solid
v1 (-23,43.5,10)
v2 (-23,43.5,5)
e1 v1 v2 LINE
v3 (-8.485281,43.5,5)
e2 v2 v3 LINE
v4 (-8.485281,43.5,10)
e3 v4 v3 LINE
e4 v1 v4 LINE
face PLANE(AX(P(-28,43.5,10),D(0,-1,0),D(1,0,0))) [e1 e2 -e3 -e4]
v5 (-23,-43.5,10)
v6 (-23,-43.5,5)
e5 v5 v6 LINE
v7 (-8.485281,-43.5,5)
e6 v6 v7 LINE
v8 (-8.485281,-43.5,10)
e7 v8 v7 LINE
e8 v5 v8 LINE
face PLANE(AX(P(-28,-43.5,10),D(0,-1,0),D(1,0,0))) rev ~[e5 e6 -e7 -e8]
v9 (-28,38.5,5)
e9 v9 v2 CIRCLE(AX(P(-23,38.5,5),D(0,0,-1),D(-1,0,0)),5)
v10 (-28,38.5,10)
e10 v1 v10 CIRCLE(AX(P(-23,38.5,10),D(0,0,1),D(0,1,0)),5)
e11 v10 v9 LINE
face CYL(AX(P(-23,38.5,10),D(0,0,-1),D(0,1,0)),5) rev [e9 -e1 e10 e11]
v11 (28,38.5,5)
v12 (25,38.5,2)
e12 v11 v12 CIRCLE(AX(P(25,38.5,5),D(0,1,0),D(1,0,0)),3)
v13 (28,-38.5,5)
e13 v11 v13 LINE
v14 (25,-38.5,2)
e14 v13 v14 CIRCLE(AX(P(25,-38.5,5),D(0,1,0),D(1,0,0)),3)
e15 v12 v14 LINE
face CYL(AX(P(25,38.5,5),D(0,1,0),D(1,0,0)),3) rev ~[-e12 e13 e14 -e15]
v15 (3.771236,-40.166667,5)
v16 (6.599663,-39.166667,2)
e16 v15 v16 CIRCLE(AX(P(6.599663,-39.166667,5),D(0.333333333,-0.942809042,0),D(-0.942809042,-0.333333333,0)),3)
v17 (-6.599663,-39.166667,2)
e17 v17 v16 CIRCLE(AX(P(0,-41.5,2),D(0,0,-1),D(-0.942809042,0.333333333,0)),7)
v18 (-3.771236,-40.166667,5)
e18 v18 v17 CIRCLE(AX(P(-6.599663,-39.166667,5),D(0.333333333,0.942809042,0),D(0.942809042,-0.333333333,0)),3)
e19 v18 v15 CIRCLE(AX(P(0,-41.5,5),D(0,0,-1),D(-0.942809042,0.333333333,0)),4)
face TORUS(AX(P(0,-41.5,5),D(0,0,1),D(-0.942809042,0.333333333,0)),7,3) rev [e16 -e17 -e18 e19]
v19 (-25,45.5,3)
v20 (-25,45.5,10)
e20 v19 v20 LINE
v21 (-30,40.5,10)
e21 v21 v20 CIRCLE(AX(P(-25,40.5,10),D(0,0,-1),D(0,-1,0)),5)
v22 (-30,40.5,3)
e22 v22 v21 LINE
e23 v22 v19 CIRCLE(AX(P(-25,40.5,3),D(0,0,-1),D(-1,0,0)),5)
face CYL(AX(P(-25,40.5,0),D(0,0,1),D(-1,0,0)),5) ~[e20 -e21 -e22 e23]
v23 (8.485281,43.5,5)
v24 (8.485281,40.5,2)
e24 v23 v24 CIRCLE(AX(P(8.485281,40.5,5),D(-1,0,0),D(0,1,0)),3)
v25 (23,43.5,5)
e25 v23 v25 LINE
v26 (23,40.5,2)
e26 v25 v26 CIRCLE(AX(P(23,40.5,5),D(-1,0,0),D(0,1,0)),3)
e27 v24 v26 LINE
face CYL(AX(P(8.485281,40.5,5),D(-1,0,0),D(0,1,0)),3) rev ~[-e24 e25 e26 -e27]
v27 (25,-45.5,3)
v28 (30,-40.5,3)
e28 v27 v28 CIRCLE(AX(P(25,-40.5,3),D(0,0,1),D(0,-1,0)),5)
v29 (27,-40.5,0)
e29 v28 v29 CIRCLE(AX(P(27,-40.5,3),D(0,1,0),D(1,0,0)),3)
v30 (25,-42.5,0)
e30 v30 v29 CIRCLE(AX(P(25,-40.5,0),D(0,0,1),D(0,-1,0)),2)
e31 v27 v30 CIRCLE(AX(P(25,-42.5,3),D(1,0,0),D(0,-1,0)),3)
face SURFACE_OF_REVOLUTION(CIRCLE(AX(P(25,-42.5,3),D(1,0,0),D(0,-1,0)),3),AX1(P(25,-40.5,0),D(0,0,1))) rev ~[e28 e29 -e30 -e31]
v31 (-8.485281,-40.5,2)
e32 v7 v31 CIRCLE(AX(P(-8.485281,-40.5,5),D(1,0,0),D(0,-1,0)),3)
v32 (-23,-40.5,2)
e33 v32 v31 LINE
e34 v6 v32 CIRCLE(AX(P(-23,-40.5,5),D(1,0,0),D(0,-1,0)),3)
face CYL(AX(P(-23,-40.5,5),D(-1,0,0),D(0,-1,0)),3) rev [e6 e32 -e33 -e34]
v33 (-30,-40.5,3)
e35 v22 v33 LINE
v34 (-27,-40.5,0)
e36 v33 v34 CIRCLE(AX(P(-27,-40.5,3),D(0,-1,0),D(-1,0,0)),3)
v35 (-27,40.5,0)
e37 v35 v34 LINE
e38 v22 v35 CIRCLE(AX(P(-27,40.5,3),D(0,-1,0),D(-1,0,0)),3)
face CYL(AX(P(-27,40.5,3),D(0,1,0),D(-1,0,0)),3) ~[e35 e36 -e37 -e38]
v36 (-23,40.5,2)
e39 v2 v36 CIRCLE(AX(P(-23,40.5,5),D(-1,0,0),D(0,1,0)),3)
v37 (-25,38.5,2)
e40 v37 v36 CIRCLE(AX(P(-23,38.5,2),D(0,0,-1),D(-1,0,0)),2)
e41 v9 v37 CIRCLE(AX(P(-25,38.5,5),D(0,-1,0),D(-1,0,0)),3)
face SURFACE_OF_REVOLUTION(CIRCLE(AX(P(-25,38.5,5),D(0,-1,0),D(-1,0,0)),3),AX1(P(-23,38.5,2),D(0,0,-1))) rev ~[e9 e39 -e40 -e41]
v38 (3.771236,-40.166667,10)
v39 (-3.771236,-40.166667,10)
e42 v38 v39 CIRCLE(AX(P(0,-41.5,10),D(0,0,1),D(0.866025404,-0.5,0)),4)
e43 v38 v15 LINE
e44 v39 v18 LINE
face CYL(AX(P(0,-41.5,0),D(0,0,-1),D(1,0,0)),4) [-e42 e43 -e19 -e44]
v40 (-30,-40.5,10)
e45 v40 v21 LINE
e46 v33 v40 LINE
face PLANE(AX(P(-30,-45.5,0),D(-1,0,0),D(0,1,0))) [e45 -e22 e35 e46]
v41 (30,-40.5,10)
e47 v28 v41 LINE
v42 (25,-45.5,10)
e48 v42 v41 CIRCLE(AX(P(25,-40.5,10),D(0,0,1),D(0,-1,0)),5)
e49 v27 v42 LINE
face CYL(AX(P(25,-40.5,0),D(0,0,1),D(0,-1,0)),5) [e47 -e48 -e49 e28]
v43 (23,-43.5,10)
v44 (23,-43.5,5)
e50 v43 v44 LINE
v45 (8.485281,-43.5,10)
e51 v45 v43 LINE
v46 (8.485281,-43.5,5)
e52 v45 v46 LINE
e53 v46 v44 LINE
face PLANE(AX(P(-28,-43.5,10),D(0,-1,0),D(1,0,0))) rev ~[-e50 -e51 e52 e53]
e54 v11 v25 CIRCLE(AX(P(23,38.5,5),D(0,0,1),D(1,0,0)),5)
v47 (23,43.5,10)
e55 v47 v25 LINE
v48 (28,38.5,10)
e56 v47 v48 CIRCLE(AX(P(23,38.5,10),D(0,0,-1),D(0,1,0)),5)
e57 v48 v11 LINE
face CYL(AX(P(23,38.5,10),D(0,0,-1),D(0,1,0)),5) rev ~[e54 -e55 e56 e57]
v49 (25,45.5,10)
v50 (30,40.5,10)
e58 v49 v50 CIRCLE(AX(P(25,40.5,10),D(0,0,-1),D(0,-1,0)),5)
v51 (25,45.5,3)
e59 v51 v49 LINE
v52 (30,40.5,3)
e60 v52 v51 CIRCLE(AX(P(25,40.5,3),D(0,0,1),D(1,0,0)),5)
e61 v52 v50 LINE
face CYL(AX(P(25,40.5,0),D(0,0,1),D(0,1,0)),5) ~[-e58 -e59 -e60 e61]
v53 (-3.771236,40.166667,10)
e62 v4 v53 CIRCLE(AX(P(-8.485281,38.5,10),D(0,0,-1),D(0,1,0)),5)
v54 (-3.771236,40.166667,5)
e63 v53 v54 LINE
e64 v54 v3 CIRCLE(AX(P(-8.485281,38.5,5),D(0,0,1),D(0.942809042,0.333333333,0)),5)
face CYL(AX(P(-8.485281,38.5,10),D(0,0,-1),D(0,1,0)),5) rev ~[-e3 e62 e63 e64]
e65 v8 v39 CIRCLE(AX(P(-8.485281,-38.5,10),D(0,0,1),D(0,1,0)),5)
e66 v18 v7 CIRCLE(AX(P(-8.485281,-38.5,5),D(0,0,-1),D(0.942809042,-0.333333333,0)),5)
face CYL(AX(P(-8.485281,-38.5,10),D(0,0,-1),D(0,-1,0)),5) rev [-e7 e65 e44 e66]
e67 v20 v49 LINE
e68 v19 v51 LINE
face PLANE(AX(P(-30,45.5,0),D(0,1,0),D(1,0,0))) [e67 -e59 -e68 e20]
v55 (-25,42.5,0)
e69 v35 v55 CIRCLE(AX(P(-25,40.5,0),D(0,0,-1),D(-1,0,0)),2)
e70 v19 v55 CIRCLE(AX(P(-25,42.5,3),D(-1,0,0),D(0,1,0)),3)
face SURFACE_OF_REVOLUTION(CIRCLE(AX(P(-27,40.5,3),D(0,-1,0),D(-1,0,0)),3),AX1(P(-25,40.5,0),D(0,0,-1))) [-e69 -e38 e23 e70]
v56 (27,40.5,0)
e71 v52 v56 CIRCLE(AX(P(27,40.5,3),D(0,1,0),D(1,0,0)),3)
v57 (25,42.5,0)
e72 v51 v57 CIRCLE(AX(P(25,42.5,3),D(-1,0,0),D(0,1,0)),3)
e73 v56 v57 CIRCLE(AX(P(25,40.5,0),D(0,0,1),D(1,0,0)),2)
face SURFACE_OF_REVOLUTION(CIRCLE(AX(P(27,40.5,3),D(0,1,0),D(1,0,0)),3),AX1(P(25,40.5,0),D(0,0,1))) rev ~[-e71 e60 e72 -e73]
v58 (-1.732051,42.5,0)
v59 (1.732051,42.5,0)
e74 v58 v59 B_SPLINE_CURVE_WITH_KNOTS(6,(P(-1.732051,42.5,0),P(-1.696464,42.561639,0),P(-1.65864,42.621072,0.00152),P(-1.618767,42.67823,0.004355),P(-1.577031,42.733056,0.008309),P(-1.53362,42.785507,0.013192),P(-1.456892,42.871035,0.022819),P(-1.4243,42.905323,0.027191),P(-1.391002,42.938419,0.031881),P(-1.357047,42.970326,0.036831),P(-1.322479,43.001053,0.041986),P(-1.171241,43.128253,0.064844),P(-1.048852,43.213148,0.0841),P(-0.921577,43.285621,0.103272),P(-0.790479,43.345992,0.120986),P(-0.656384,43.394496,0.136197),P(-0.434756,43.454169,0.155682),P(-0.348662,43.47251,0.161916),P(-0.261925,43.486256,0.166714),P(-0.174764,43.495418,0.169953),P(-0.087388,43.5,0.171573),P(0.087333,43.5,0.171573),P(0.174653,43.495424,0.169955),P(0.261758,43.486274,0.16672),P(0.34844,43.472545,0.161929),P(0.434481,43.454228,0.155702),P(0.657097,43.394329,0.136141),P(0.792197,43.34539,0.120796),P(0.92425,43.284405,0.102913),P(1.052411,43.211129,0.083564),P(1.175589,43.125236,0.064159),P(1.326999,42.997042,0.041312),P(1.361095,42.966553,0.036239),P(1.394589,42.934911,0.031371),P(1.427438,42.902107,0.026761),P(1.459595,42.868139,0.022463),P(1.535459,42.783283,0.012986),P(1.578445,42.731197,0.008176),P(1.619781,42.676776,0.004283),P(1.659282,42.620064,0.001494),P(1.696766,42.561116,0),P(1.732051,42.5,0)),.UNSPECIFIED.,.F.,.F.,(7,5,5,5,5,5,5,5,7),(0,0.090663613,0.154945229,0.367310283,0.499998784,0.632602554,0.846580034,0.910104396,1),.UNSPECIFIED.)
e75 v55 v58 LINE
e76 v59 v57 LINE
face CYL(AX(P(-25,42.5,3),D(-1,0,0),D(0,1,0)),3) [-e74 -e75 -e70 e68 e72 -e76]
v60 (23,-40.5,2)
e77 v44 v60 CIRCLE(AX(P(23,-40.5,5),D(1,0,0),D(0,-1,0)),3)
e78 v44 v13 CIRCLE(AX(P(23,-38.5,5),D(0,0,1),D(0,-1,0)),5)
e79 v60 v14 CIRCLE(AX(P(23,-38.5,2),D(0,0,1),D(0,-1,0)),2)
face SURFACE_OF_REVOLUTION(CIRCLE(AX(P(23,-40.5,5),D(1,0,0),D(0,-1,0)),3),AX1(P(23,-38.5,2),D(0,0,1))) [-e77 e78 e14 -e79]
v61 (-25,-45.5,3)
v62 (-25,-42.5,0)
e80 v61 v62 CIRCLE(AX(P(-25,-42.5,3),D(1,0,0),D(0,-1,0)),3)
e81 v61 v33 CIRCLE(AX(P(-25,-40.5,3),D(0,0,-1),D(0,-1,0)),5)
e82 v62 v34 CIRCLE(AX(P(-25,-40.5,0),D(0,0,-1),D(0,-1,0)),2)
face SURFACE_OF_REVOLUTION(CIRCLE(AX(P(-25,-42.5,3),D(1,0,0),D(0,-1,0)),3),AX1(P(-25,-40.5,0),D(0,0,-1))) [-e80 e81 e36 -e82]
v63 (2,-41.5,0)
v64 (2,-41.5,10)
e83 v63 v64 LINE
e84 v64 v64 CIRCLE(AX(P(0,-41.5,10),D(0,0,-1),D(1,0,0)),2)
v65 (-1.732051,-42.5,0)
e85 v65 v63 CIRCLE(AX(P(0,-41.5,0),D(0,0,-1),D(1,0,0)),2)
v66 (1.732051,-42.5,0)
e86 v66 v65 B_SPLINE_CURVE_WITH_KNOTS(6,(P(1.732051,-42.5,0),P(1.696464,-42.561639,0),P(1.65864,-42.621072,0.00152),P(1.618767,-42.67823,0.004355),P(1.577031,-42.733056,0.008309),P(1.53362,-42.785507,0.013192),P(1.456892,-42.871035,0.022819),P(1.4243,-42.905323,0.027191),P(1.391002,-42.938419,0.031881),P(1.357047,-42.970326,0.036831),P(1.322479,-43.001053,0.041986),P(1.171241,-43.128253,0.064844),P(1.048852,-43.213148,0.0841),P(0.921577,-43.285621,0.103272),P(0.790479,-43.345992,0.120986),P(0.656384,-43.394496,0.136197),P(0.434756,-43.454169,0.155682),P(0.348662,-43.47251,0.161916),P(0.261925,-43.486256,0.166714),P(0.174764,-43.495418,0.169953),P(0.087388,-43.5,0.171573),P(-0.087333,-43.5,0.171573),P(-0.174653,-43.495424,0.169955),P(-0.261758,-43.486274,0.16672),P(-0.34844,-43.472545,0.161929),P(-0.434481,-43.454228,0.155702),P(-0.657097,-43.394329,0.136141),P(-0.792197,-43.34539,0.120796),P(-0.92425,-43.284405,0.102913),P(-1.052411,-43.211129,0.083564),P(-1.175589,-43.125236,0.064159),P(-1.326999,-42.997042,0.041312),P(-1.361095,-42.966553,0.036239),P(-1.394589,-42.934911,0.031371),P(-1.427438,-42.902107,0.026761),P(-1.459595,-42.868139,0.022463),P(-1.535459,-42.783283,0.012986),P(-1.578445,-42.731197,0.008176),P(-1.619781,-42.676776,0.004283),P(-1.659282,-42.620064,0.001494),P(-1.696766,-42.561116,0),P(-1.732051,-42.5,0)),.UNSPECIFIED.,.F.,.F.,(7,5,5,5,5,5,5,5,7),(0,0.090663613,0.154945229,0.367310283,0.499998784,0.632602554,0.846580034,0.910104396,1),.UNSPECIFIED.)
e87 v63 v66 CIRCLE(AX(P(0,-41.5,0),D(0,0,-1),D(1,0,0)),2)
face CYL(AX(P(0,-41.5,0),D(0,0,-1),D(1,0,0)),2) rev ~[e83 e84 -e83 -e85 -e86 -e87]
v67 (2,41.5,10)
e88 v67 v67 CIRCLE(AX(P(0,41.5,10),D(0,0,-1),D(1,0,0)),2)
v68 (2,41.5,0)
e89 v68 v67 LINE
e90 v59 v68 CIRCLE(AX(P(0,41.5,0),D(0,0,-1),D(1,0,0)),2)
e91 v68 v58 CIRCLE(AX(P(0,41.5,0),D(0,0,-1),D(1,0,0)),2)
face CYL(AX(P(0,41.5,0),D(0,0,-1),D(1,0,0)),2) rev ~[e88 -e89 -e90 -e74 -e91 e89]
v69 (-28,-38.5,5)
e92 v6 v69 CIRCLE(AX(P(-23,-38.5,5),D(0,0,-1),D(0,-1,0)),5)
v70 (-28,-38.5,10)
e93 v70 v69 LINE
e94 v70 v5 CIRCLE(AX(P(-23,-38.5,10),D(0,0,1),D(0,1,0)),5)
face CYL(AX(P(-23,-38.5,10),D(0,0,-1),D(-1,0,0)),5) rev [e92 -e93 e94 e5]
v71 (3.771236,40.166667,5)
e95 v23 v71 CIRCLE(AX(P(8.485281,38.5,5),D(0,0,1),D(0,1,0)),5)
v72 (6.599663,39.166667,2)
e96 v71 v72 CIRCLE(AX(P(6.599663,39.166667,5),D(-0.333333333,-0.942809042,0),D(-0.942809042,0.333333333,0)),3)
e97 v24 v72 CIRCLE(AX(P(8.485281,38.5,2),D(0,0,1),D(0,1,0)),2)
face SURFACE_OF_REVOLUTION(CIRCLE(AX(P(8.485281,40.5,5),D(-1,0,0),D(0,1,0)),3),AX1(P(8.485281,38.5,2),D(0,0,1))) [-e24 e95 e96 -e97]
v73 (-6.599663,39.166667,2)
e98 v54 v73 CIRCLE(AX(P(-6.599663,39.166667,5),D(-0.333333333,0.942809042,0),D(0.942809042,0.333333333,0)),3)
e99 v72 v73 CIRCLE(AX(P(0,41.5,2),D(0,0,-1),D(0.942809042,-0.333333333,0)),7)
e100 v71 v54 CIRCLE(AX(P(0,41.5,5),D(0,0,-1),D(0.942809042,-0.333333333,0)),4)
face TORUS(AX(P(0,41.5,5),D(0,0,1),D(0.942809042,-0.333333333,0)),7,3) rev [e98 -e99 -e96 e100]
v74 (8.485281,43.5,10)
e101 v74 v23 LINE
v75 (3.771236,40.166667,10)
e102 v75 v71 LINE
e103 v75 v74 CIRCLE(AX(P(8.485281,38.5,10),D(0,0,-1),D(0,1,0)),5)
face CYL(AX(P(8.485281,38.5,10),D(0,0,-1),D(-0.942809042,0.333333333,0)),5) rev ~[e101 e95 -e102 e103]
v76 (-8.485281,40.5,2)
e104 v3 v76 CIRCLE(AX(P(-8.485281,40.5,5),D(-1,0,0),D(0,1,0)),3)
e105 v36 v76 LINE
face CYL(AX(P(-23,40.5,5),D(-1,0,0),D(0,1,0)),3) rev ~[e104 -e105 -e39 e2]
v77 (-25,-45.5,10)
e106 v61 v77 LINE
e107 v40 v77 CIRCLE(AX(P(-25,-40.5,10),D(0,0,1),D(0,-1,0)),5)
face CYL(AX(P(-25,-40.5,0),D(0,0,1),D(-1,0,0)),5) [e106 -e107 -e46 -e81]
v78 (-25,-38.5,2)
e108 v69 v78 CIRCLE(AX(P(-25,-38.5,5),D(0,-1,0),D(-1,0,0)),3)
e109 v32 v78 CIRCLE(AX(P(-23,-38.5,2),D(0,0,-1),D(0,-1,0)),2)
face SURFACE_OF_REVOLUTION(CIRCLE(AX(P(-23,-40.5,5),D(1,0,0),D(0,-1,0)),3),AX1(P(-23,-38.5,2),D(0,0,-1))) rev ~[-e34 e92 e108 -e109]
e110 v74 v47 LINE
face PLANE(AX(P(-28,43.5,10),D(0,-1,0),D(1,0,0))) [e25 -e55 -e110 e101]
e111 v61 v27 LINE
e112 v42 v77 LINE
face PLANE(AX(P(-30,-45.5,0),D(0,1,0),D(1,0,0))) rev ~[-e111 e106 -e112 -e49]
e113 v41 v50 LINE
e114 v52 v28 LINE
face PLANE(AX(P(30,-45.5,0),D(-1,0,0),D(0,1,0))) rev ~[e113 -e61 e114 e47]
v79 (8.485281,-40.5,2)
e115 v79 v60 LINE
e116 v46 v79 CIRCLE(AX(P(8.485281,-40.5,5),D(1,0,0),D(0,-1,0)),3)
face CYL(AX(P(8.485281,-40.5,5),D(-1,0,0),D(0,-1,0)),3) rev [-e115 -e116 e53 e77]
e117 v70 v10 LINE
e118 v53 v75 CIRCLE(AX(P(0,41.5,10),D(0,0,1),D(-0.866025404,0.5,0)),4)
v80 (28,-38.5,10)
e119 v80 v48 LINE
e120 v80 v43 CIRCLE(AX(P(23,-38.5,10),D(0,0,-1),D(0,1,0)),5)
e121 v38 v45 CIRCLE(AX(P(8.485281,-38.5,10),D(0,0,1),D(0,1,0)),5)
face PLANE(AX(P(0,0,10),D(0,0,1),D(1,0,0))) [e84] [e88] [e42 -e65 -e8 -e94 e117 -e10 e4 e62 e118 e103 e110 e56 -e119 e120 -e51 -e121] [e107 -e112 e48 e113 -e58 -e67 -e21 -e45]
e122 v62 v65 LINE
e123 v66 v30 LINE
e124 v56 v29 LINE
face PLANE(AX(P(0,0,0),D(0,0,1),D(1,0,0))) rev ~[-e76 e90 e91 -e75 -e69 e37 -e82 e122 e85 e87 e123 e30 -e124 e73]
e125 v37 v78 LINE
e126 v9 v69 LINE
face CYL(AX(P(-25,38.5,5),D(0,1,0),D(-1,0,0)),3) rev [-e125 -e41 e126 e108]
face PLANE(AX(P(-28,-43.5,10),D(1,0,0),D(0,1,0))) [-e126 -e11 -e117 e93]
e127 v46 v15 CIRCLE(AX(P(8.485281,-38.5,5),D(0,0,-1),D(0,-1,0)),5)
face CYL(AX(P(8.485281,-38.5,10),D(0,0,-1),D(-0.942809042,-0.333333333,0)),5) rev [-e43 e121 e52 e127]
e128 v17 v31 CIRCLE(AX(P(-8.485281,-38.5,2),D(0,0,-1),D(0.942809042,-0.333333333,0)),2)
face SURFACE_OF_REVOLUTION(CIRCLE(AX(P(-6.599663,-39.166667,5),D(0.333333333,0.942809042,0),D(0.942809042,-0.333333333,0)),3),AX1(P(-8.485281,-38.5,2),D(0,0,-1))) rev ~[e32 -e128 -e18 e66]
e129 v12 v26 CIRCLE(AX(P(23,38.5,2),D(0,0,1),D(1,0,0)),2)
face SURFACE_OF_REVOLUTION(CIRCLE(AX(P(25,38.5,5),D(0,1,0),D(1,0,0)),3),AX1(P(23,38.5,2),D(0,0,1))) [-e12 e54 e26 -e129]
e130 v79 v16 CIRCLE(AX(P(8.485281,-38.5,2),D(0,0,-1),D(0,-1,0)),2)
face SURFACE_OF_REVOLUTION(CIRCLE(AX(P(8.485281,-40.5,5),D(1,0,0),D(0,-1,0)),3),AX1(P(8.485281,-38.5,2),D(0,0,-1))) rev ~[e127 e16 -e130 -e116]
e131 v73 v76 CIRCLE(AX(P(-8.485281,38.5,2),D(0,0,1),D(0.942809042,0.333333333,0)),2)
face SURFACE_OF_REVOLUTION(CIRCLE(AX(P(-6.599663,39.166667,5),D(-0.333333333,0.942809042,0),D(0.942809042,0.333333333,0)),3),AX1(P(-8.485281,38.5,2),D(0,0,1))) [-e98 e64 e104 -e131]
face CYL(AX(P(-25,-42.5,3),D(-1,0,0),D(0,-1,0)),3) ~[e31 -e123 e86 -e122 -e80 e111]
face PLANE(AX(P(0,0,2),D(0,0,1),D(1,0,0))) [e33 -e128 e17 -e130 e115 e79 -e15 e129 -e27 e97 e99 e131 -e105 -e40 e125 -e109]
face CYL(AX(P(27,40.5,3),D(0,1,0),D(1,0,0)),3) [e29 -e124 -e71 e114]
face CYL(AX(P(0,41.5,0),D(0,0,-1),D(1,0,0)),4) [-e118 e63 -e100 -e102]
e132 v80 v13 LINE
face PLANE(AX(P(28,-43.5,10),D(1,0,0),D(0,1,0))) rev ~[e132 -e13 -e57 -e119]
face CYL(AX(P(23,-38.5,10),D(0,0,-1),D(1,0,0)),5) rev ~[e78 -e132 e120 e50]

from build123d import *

# Parameters (mm, degrees)
F3_W          = 60
F3_H          = 91
F4_DEPTH      = 10
F5_W          = 56
F5_H          = 87
F6_DEPTH      = 8
F7_R          = 4
F8_DEPTH      = 10
F9_R          = 2
F10_DEPTH     = 10.001
F11_R         = 5
F12_R         = 5
F13_T1_DEPTH  = 77
F13_T3_DEPTH  = 14.5147186258
F13_T5_DEPTH  = 14.5147186258
F13_T8_ANGLE  = 90
F13_T10_ANGLE = 70.5287793655
F13_T12_ANGLE = 141.057558731
F13_T14_ANGLE = 90
F13_T16_ANGLE = 70.5287793655
F13_T18_ANGLE = 70.5287793655
F13_T20_ANGLE = 90
F13_T22_ANGLE = 141.057558731
F13_T24_ANGLE = 70.5287793655
F13_T26_ANGLE = 90
F13_T27_DEPTH = 81
F13_T29_DEPTH = 50
F13_T32_ANGLE = 90
F13_T34_ANGLE = 90
F13_T36_ANGLE = 90
F13_T38_ANGLE = 90


# Not quite as in the source:
# - a fillet or chamfer that OpenCascade refuses, or shapes differently, is made with other operations: its cross-section is extruded or revolved along the edge and cut away or added


with BuildPart() as f4:
    # F3 (on Top) → F4 (new body)
    with BuildSketch(Plane.XY):
        Rectangle(F3_W, F3_H)
    extrude(amount=F4_DEPTH)

    # F5 (on face) → F6 (cut)
    with BuildSketch(Plane.XY.offset(10)):
        Rectangle(F5_W, F5_H)
    extrude(amount=-F6_DEPTH, mode=Mode.SUBTRACT)

    # F7 (on face) → F8 (join)
    with BuildSketch(Plane(origin=(0, 0, 0), x_dir=(1, 0, 0), z_dir=(0, 0, -1))):
        with Locations((0, -41.5)):
            Circle(F7_R)
        with Locations((0, 41.5)):
            Circle(F7_R)
    extrude(amount=-F8_DEPTH)

    # F9 (on face) → F10 (cut, through all)
    with BuildSketch(Plane(origin=(0, 0, 0), x_dir=(1, 0, 0), z_dir=(0, 0, -1))):
        with Locations((0, -41.5)):
            Circle(F9_R)
        with Locations((0, 41.5)):
            Circle(F9_R)
    extrude(amount=-F10_DEPTH, mode=Mode.SUBTRACT)

    # F11
    f11_edges = [f4.edges().sort_by_distance(p)[0] for p in [
        (3.464102, 43.5, 6),
        (-3.464102, 43.5, 6),
        (-3.464102, -43.5, 6),
        (3.464102, -43.5, 6),
    ]]
    fillet(f11_edges, radius=F11_R)

    # F12
    f12_edges = [f4.edges().sort_by_distance(p)[0] for p in [
        (30, -45.5, 5),
        (-30, -45.5, 5),
        (30, 45.5, 5),
        (-30, 45.5, 5),
        (28, -43.5, 6),
        (-28, -43.5, 6),
        (-28, 43.5, 6),
        (28, 43.5, 6),
    ]]
    fillet(f12_edges, radius=F12_R)

    # F13: fillet of radius 3 on 24 edges, made by hand

    # F13_s2 → F13_t1 (join)
    with BuildSketch(Plane.XZ.offset(-38.5)):
        with BuildLine():
            ThreePointArc((-28, 5), (-27.1213203436, 2.8786796564), (-25, 2))
            Line((-25, 2), (-28, 2))
            Line((-28, 2), (-28, 5))
        make_face()
        with BuildLine():
            ThreePointArc((28, 5), (27.1213203436, 2.8786796564), (25, 2))
            Line((25, 2), (28, 2))
            Line((28, 2), (28, 5))
        make_face()
    extrude(amount=F13_T1_DEPTH)

    # F13_s4 → F13_t3 (join)
    with BuildSketch(Plane.YZ.offset(8.4852813742)):
        with BuildLine():
            ThreePointArc((-43.5, 5), (-42.6213203436, 2.8786796564), (-40.5, 2))
            Line((-40.5, 2), (-43.5, 2))
            Line((-43.5, 2), (-43.5, 5))
        make_face()
        with BuildLine():
            ThreePointArc((43.5, 5), (42.6213203436, 2.8786796564), (40.5, 2))
            Line((40.5, 2), (43.5, 2))
            Line((43.5, 2), (43.5, 5))
        make_face()
    extrude(amount=F13_T3_DEPTH)

    # F13_s6 → F13_t5 (join)
    with BuildSketch(Plane.YZ.offset(-23)):
        with BuildLine():
            ThreePointArc((-43.5, 5), (-42.6213203436, 2.8786796564), (-40.5, 2))
            Line((-40.5, 2), (-43.5, 2))
            Line((-43.5, 2), (-43.5, 5))
        make_face()
        with BuildLine():
            ThreePointArc((43.5, 5), (42.6213203436, 2.8786796564), (40.5, 2))
            Line((40.5, 2), (43.5, 2))
            Line((43.5, 2), (43.5, 5))
        make_face()
    extrude(amount=F13_T5_DEPTH)

    # F13_s7 → F13_t8 (revolve)
    with BuildSketch(Plane.YZ.offset(23)):
        with BuildLine():
            ThreePointArc((-43.5, 5), (-42.6213203436, 2.8786796564), (-40.5, 2))
            Line((-40.5, 2), (-43.5, 2))
            Line((-43.5, 2), (-43.5, 5))
        make_face()
    revolve(axis=Axis((23, -38.5, 2), (0, 0, 1)), revolution_arc=F13_T8_ANGLE)

    # F13_s9 → F13_t10 (revolve)
    with BuildSketch(Plane.YZ.offset(8.4852813742)):
        with BuildLine():
            ThreePointArc((-43.5, 5), (-42.6213203436, 2.8786796564), (-40.5, 2))
            Line((-40.5, 2), (-43.5, 2))
            Line((-43.5, 2), (-43.5, 5))
        make_face()
    revolve(axis=Axis((8.4852813742, -38.5, 2), (0, 0, -1)), revolution_arc=F13_T10_ANGLE)

    # F13_s11 → F13_t12 (revolve)
    with BuildSketch(Plane(origin=(-13.0421917419, -36.8888888889, 0), x_dir=(0, 0, 1), z_dir=(-0.3333333333, -0.9428090416, 0))):
        with BuildLine():
            ThreePointArc((5, -9.8333333333), (2.8786796564, -8.9546536769), (2, -6.8333333333))
            Line((2, -6.8333333333), (2, -9.8333333333))
            Line((2, -9.8333333333), (5, -9.8333333333))
        make_face()
    revolve(axis=Axis((0, -41.5, 2), (0, 0, -1)), revolution_arc=F13_T12_ANGLE)

    # F13_s13 → F13_t14 (revolve)
    with BuildSketch(Plane.XZ.offset(-38.5)):
        with BuildLine():
            ThreePointArc((28, 5), (27.1213203436, 2.8786796564), (25, 2))
            Line((25, 2), (28, 2))
            Line((28, 2), (28, 5))
        make_face()
    revolve(axis=Axis((23, 38.5, 2), (0, 0, 1)), revolution_arc=F13_T14_ANGLE)

    # F13_s15 → F13_t16 (revolve)
    with BuildSketch(Plane(origin=(-13.0421917419, -36.8888888889, 0), x_dir=(0, 0, 1), z_dir=(0.3333333333, 0.9428090416, 0))):
        with BuildLine():
            ThreePointArc((5, 9.8333333333), (2.8786796564, 8.9546536769), (2, 6.8333333333))
            Line((2, 6.8333333333), (2, 9.8333333333))
            Line((2, 9.8333333333), (5, 9.8333333333))
        make_face()
    revolve(axis=Axis((-8.4852813742, -38.5, 2), (0, 0, -1)), revolution_arc=F13_T16_ANGLE)

    # F13_s17 → F13_t18 (revolve)
    with BuildSketch(Plane.YZ.offset(8.4852813742)):
        with BuildLine():
            ThreePointArc((43.5, 5), (42.6213203436, 2.8786796564), (40.5, 2))
            Line((40.5, 2), (43.5, 2))
            Line((43.5, 2), (43.5, 5))
        make_face()
    revolve(axis=Axis((8.4852813742, 38.5, 2), (0, 0, 1)), revolution_arc=F13_T18_ANGLE)

    # F13_s19 → F13_t20 (revolve)
    with BuildSketch(Plane.YZ.offset(-23)):
        with BuildLine():
            ThreePointArc((-43.5, 5), (-42.6213203436, 2.8786796564), (-40.5, 2))
            Line((-40.5, 2), (-43.5, 2))
            Line((-43.5, 2), (-43.5, 5))
        make_face()
    revolve(axis=Axis((-23, -38.5, 2), (0, 0, -1)), revolution_arc=F13_T20_ANGLE)

    # F13_s21 → F13_t22 (revolve)
    with BuildSketch(Plane(origin=(13.0421917419, 36.8888888889, 0), x_dir=(0, 0, 1), z_dir=(0.3333333333, 0.9428090416, 0))):
        with BuildLine():
            ThreePointArc((5, -9.8333333333), (2.8786796564, -8.9546536769), (2, -6.8333333333))
            Line((2, -6.8333333333), (2, -9.8333333333))
            Line((2, -9.8333333333), (5, -9.8333333333))
        make_face()
    revolve(axis=Axis((0, 41.5, 2), (0, 0, -1)), revolution_arc=F13_T22_ANGLE)

    # F13_s23 → F13_t24 (revolve)
    with BuildSketch(Plane(origin=(-13.0421917419, 36.8888888889, 0), x_dir=(0, 0, 1), z_dir=(0.3333333333, -0.9428090416, 0))):
        with BuildLine():
            ThreePointArc((5, -9.8333333333), (2.8786796564, -8.9546536769), (2, -6.8333333333))
            Line((2, -6.8333333333), (2, -9.8333333333))
            Line((2, -9.8333333333), (5, -9.8333333333))
        make_face()
    revolve(axis=Axis((-8.4852813742, 38.5, 2), (0, 0, 1)), revolution_arc=F13_T24_ANGLE)

    # F13_s25 → F13_t26 (revolve)
    with BuildSketch(Plane.XZ.offset(-38.5)):
        with BuildLine():
            ThreePointArc((-28, 5), (-27.1213203436, 2.8786796564), (-25, 2))
            Line((-25, 2), (-28, 2))
            Line((-28, 2), (-28, 5))
        make_face()
    revolve(axis=Axis((-23, 38.5, 2), (0, 0, -1)), revolution_arc=F13_T26_ANGLE)

    # F13_s28 → F13_t27 (cut)
    with BuildSketch(Plane.XZ.offset(-40.5)):
        with BuildLine():
            ThreePointArc((30, 3), (29.1213203436, 0.8786796564), (27, 0))
            Line((27, 0), (30, 0))
            Line((30, 0), (30, 3))
        make_face()
        with BuildLine():
            ThreePointArc((-30, 3), (-29.1213203436, 0.8786796564), (-27, 0))
            Line((-27, 0), (-30, 0))
            Line((-30, 0), (-30, 3))
        make_face()
    extrude(amount=F13_T27_DEPTH, mode=Mode.SUBTRACT)

    # F13_s30 → F13_t29 (cut)
    with BuildSketch(Plane.YZ.offset(-25)):
        with BuildLine():
            ThreePointArc((-45.5, 3), (-44.6213203436, 0.8786796564), (-42.5, 0))
            Line((-42.5, 0), (-45.5, 0))
            Line((-45.5, 0), (-45.5, 3))
        make_face()
        with BuildLine():
            ThreePointArc((45.5, 3), (44.6213203436, 0.8786796564), (42.5, 0))
            Line((42.5, 0), (45.5, 0))
            Line((45.5, 0), (45.5, 3))
        make_face()
    extrude(amount=F13_T29_DEPTH, mode=Mode.SUBTRACT)

    # F13_s31 → F13_t32 (revolve, cut)
    with BuildSketch(Plane.YZ.offset(25)):
        with BuildLine():
            ThreePointArc((-45.5, 3), (-44.6213203436, 0.8786796564), (-42.5, 0))
            Line((-42.5, 0), (-45.5, 0))
            Line((-45.5, 0), (-45.5, 3))
        make_face()
    revolve(axis=Axis((25, -40.5, 0), (0, 0, 1)), revolution_arc=F13_T32_ANGLE, mode=Mode.SUBTRACT)

    # F13_s33 → F13_t34 (revolve, cut)
    with BuildSketch(Plane.YZ.offset(-25)):
        with BuildLine():
            ThreePointArc((-45.5, 3), (-44.6213203436, 0.8786796564), (-42.5, 0))
            Line((-42.5, 0), (-45.5, 0))
            Line((-45.5, 0), (-45.5, 3))
        make_face()
    revolve(axis=Axis((-25, -40.5, 0), (0, 0, -1)), revolution_arc=F13_T34_ANGLE, mode=Mode.SUBTRACT)

    # F13_s35 → F13_t36 (revolve, cut)
    with BuildSketch(Plane.XZ.offset(-40.5)):
        with BuildLine():
            ThreePointArc((30, 3), (29.1213203436, 0.8786796564), (27, 0))
            Line((27, 0), (30, 0))
            Line((30, 0), (30, 3))
        make_face()
    revolve(axis=Axis((25, 40.5, 0), (0, 0, 1)), revolution_arc=F13_T36_ANGLE, mode=Mode.SUBTRACT)

    # F13_s37 → F13_t38 (revolve, cut)
    with BuildSketch(Plane.XZ.offset(-40.5)):
        with BuildLine():
            ThreePointArc((-30, 3), (-29.1213203436, 0.8786796564), (-27, 0))
            Line((-27, 0), (-30, 0))
            Line((-30, 0), (-30, 3))
        make_face()
    revolve(axis=Axis((-25, 40.5, 0), (0, 0, -1)), revolution_arc=F13_T38_ANGLE, mode=Mode.SUBTRACT)


solid = f4.part
